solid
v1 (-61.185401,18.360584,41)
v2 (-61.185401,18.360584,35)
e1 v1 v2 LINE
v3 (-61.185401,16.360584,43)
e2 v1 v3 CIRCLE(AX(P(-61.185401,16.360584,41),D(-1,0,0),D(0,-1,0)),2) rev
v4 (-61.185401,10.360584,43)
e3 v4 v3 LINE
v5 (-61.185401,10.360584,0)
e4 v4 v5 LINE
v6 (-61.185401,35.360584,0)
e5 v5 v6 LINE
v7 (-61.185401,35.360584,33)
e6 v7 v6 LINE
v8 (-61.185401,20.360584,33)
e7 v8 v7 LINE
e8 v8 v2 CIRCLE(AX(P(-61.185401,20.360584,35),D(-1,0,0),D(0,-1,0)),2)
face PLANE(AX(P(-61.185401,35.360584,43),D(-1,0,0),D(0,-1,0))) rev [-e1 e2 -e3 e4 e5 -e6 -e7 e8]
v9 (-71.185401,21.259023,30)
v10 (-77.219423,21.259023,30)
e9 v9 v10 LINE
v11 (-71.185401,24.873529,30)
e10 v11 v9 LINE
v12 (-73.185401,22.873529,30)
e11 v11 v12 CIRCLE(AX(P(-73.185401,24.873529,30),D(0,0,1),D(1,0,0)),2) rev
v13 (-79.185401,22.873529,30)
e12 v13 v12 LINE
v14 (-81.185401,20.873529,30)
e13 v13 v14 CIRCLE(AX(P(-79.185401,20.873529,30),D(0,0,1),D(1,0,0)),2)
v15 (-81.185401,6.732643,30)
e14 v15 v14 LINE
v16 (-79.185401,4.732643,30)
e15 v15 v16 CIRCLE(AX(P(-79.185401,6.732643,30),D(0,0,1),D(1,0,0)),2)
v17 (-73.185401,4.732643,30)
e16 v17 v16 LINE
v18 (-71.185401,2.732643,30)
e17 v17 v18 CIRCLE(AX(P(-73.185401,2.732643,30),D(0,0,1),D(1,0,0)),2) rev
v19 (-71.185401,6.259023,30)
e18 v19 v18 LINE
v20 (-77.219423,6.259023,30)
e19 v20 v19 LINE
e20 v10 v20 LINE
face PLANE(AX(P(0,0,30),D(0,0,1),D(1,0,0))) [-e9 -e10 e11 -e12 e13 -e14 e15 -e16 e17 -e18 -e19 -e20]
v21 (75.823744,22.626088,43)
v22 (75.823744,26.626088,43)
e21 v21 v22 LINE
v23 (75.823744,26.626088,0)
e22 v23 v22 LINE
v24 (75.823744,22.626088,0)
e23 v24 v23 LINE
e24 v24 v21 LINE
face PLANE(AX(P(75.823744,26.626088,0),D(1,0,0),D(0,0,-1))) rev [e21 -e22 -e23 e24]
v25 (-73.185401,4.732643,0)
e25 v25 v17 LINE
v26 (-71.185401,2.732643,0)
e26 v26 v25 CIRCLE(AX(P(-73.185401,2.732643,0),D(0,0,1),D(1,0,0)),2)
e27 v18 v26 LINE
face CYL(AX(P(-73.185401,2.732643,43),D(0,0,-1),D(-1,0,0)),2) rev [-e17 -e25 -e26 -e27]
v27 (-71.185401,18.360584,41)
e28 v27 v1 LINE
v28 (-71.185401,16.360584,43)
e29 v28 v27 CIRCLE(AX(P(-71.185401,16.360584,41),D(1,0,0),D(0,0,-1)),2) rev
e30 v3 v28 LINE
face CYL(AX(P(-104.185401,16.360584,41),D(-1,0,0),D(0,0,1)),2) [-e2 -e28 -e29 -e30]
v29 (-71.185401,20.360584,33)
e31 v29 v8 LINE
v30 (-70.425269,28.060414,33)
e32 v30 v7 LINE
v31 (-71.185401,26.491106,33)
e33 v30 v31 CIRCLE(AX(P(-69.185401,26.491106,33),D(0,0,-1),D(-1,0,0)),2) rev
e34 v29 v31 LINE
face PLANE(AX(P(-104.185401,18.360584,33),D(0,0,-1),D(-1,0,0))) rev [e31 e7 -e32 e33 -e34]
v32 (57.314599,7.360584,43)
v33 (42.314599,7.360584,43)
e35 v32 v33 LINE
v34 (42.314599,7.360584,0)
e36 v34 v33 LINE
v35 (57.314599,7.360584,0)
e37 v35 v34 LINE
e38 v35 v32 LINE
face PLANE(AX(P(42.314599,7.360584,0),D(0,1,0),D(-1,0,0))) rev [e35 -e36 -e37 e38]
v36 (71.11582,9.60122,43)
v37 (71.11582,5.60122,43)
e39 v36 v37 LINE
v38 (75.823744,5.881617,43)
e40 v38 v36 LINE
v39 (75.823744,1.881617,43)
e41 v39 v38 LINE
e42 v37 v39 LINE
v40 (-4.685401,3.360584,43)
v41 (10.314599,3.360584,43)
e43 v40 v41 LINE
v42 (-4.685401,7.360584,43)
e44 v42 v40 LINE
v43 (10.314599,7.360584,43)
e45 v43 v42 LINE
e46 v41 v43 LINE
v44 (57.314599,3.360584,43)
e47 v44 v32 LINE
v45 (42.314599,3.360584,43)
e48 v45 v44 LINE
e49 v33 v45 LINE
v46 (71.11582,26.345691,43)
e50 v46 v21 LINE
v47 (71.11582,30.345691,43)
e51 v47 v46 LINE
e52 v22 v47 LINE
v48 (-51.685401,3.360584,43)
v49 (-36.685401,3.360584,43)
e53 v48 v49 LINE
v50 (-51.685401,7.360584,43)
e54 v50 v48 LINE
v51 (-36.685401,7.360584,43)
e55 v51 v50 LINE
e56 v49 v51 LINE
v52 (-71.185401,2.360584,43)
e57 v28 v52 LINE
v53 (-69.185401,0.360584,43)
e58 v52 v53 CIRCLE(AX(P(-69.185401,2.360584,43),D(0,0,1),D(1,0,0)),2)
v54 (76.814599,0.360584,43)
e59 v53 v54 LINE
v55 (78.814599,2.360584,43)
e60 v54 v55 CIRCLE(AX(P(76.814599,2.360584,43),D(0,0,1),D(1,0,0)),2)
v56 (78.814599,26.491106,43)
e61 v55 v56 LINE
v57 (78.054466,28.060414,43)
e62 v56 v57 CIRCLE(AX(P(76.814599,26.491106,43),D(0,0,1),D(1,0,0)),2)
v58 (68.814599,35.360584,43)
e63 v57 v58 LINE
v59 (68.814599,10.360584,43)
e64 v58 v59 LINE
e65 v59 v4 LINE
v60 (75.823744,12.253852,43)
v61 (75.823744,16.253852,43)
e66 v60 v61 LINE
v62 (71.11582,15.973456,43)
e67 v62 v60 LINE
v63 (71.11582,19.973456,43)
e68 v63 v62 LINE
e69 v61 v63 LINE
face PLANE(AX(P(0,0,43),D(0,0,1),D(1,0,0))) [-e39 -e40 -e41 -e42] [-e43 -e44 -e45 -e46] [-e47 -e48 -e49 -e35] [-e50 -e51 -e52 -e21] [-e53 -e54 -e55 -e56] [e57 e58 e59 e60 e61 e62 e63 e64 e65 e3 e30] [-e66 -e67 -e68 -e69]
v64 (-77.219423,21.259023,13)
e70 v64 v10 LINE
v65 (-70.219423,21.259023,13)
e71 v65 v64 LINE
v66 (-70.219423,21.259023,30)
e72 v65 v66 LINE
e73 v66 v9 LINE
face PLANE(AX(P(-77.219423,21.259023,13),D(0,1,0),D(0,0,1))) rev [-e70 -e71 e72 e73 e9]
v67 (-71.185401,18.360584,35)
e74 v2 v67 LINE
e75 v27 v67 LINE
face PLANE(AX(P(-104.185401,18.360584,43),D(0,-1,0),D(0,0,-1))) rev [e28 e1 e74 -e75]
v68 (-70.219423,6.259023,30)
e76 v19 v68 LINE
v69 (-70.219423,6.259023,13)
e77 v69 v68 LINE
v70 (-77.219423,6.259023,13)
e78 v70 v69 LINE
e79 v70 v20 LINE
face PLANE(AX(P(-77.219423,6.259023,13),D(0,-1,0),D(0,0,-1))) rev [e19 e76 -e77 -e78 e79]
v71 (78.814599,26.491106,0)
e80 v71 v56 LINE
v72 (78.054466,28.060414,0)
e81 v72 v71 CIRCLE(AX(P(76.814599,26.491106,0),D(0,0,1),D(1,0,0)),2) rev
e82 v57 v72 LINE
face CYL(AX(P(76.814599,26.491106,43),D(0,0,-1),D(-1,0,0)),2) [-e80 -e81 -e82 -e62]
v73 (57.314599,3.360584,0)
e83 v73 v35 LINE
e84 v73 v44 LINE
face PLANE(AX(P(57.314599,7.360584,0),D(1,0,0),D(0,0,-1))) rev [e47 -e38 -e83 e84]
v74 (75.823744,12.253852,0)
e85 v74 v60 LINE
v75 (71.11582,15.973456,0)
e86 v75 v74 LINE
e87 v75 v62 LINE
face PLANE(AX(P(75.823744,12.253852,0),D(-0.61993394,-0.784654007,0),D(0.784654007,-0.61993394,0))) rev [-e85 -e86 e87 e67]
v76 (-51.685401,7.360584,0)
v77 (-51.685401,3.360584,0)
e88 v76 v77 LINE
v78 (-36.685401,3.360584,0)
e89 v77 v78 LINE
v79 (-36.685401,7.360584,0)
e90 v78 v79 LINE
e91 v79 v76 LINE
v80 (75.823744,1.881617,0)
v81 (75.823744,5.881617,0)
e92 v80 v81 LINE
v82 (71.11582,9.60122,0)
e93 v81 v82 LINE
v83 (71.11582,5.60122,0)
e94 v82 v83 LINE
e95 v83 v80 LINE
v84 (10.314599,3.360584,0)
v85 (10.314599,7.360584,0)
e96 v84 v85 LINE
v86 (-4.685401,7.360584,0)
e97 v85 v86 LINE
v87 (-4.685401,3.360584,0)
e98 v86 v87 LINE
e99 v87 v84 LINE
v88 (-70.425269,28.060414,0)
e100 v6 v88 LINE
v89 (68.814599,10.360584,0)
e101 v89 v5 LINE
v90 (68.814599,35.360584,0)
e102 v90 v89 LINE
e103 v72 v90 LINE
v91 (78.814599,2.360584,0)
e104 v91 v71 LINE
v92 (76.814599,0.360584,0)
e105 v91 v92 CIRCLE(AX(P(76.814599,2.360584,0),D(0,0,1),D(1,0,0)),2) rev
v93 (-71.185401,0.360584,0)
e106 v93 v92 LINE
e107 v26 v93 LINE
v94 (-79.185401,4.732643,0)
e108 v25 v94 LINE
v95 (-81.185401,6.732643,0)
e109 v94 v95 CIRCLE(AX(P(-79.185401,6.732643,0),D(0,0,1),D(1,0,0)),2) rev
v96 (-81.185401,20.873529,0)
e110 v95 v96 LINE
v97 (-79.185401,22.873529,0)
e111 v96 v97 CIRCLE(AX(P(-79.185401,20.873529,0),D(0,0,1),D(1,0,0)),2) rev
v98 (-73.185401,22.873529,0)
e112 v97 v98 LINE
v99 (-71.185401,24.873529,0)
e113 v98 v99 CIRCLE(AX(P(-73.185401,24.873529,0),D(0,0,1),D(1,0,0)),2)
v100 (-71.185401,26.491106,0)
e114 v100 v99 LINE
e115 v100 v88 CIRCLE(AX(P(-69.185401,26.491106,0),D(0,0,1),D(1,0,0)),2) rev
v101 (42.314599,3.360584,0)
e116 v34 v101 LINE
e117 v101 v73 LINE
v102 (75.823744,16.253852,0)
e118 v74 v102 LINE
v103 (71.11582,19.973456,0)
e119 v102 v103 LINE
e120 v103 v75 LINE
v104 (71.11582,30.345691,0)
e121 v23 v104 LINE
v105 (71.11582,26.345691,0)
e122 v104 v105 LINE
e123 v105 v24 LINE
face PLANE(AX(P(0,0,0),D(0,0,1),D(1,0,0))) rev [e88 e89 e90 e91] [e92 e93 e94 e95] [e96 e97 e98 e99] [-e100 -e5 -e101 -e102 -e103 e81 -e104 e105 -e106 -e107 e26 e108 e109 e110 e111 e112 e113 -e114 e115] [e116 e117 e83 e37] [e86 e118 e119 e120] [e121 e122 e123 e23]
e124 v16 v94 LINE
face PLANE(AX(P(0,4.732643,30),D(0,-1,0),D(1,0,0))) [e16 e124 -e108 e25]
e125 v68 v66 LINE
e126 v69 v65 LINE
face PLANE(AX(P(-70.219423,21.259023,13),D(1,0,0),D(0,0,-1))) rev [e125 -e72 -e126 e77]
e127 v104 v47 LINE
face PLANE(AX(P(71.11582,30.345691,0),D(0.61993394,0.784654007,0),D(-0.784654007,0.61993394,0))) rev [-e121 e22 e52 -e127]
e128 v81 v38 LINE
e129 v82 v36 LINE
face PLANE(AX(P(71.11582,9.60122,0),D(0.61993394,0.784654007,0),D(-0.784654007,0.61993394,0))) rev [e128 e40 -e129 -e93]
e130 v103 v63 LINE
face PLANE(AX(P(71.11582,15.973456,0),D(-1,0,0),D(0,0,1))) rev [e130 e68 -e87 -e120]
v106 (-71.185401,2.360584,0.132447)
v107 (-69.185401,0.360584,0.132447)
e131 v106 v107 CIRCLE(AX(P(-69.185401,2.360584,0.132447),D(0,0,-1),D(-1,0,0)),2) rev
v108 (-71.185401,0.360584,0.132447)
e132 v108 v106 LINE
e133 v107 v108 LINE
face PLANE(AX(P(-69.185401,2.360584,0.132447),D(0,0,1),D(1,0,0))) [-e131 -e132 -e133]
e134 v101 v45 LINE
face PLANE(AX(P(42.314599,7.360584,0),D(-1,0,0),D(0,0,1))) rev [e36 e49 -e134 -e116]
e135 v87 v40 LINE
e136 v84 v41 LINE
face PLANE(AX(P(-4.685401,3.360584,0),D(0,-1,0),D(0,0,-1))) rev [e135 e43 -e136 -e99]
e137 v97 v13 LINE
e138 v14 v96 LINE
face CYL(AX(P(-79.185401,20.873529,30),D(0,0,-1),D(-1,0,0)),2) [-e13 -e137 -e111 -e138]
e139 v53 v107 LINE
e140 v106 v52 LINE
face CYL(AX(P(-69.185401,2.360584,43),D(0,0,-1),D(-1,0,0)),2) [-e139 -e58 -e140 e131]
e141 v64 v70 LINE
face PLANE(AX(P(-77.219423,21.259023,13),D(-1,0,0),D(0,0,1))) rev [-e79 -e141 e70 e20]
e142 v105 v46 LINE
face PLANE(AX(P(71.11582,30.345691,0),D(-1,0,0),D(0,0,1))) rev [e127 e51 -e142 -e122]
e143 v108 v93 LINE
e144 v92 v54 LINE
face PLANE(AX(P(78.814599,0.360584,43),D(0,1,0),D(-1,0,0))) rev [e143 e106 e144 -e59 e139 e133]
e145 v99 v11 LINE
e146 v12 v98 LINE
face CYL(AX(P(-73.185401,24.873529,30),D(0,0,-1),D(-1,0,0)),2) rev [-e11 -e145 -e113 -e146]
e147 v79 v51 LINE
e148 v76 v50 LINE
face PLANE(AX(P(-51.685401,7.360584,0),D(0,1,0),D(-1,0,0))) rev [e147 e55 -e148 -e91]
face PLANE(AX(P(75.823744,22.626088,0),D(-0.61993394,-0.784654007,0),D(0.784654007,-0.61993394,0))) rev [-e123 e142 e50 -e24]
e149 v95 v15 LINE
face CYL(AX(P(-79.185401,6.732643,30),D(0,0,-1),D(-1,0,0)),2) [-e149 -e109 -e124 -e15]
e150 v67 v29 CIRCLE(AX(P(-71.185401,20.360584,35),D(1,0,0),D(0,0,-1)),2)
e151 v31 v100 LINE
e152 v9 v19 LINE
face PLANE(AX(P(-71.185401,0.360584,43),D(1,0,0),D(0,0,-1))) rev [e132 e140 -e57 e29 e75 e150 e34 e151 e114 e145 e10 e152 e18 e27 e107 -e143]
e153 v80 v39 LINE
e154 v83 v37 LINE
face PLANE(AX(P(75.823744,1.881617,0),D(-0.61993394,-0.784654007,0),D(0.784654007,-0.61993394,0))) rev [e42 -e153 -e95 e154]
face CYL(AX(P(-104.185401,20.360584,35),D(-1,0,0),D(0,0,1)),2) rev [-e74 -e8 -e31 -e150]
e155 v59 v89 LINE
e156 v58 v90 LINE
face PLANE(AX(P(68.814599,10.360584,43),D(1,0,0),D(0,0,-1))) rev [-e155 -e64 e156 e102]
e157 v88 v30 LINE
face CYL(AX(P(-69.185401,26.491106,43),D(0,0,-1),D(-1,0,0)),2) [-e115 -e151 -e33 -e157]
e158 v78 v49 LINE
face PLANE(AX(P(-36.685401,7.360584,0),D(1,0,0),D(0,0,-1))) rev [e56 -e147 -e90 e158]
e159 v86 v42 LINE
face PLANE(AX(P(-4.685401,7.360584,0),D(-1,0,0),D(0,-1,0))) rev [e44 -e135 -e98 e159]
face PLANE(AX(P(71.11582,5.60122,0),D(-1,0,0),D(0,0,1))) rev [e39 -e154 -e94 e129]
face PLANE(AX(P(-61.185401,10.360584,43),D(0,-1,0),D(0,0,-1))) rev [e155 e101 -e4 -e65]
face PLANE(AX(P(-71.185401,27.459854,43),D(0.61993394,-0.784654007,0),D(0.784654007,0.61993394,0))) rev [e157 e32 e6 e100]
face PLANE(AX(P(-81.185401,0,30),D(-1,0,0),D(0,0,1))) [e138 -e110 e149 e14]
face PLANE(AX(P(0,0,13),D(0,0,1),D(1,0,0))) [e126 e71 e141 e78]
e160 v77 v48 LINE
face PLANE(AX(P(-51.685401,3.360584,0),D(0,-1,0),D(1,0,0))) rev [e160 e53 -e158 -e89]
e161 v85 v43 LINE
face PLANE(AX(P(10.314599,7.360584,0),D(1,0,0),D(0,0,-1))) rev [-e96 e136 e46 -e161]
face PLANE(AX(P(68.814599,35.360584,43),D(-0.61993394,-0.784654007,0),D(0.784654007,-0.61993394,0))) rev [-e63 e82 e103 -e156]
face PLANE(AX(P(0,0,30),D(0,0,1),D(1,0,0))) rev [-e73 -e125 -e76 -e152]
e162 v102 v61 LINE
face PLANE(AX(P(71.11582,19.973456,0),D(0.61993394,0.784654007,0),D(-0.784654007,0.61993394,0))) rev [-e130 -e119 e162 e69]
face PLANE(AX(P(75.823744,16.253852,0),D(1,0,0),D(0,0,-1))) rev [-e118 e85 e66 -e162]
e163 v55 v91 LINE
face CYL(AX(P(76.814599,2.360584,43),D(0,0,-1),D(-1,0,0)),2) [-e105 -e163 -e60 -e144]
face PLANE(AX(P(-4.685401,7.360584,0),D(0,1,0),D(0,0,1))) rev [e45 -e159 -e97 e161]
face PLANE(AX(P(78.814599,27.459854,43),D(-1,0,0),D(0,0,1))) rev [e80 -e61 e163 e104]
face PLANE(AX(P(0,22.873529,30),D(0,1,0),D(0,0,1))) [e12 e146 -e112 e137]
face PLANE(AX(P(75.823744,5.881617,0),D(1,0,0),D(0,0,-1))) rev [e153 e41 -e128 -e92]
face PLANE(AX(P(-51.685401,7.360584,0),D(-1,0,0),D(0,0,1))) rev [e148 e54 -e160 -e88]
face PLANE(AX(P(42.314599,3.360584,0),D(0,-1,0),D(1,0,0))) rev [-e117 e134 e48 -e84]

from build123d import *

# Parameters (mm, degrees)
EXTRUDE_1_DEPTH     = 43
SKETCH_2_W          = 10
SKETCH_2_H          = 17
CUT_EXTRUDE_1_DEPTH = 43
EXTRUDE_2_DEPTH     = 30
SKETCH_5_W          = 15
SKETCH_5_H          = 4
CUT_EXTRUDE_3_DEPTH = 99.440034066
CUT_EXTRUDE_4_DEPTH = 99.440034066
FILLET_1_R          = 2
FILLET_START        = 0.132447056
FILLET_2_DEPTH      = 43.867552944
FILLET_3_R          = 2
SKETCH_7_W          = 7
SKETCH_7_H          = 15
CUT_EXTRUDE_5_DEPTH = 17
FILLET_4_R          = 2


with BuildPart() as part:
    # Эскиз1 → Бобышка-Вытянуть1 (new body)
    with BuildSketch(Plane.XY):
        Polygon((-61.18540146, 10.360583942), (68.81459854, 10.360583942), (68.81459854, 35.360583942), (78.81459854, 27.459854015), (78.81459854, 0.360583942), (-71.18540146, 0.360583942), (-71.18540146, 27.459854015), (-61.18540146, 35.360583942), align=None)
    extrude(amount=EXTRUDE_1_DEPTH)

    # Эскиз2 → Вырез-Вытянуть1 (cut)
    with BuildSketch(Plane(origin=(-61.18540146, 0, 0), x_dir=(0, 0, -1), z_dir=(1, 0, 0))):
        with Locations((-38, 26.860583942)):
            Rectangle(SKETCH_2_W, SKETCH_2_H)
    extrude(amount=-CUT_EXTRUDE_1_DEPTH, mode=Mode.SUBTRACT)

    # Эскиз3 → Бобышка-Вытянуть2 (add)
    with BuildSketch(Plane.XY):
        Polygon((-71.18540146, 18.360583942), (-71.18540146, 22.873529361), (-81.18540146, 22.873529361), (-81.18540146, 18.360583942), (-81.18540146, 4.73264295), (-71.18540146, 4.73264295), align=None)
    extrude(amount=EXTRUDE_2_DEPTH)

    # Эскиз5 → Вырез-Вытянуть3 (cut, through all)
    with BuildSketch(Plane.XY.offset(43)):
        with Locations((2.81459854, 5.360583942)):
            Rectangle(SKETCH_5_W, SKETCH_5_H)
        with Locations((-44.18540146, 5.360583942)):
            Rectangle(SKETCH_5_W, SKETCH_5_H)
        with Locations((49.81459854, 5.360583942)):
            Rectangle(SKETCH_5_W, SKETCH_5_H)
    extrude(amount=-CUT_EXTRUDE_3_DEPTH, mode=Mode.SUBTRACT)

    # Эскиз6 → Вырез-Вытянуть4 (cut, through all)
    with BuildSketch(Plane.XY.offset(43)):
        Polygon((71.115819654, 30.345691142), (75.823743696, 26.626087505), (75.823743696, 22.626087505), (71.115819654, 26.345691142), align=None)
        Polygon((71.115819654, 19.973455793), (75.823743696, 16.253852156), (75.823743696, 12.253852156), (71.115819654, 15.973455793), align=None)
        Polygon((71.115819654, 9.601220443), (75.823743696, 5.881616806), (75.823743696, 1.881616806), (71.115819654, 5.601220443), align=None)
    extrude(amount=-CUT_EXTRUDE_4_DEPTH, mode=Mode.SUBTRACT)

    # Скругление1
    fillet_1_edges = [part.edges().sort_by_distance(p)[0] for p in [
        (78.81459854, 27.459854015, 21.5),
        (78.81459854, 0.360583942, 21.5),
        (-71.18540146, 27.459854015, 16.5),
    ]]
    fillet(fillet_1_edges, radius=FILLET_1_R)

    # Скругление2: read off the stored shape, not the designer's step
    # Скругление2 outline → Скругление2 (cut)
    with BuildSketch(Plane.XY.offset(FILLET_START)):
        with BuildLine():
            Line((-71.18540146, 0.360583942), (-69.18540146, 0.360583942))
            ThreePointArc((-69.18540146, 0.360583942), (-70.599615022, 0.94637038), (-71.18540146, 2.360583942))
            Line((-71.18540146, 2.360583942), (-71.18540146, 0.360583942))
        make_face()
    extrude(amount=FILLET_2_DEPTH, mode=Mode.SUBTRACT)

    # Скругление3
    fillet_3_edges = [part.edges().sort_by_distance(p)[0] for p in [
        (-66.18540146, 18.360583942, 43),
        (-66.18540146, 18.360583942, 33),
    ]]
    fillet(fillet_3_edges, radius=FILLET_3_R)

    # Эскиз7 → Вырез-Вытянуть5 (cut)
    with BuildSketch(Plane.XY.offset(30)):
        with Locations((-73.719422713, 13.759023225)):
            Rectangle(SKETCH_7_W, SKETCH_7_H)
    extrude(amount=-CUT_EXTRUDE_5_DEPTH, mode=Mode.SUBTRACT)

    # Скругление4
    fillet_4_edges = [part.edges().sort_by_distance(p)[0] for p in [
        (-81.18540146, 4.73264295, 15),
        (-71.18540146, 4.73264295, 15),
        (-71.18540146, 22.873529361, 15),
        (-81.18540146, 22.873529361, 15),
    ]]
    fillet(fillet_4_edges, radius=FILLET_4_R)


solid = part.part
